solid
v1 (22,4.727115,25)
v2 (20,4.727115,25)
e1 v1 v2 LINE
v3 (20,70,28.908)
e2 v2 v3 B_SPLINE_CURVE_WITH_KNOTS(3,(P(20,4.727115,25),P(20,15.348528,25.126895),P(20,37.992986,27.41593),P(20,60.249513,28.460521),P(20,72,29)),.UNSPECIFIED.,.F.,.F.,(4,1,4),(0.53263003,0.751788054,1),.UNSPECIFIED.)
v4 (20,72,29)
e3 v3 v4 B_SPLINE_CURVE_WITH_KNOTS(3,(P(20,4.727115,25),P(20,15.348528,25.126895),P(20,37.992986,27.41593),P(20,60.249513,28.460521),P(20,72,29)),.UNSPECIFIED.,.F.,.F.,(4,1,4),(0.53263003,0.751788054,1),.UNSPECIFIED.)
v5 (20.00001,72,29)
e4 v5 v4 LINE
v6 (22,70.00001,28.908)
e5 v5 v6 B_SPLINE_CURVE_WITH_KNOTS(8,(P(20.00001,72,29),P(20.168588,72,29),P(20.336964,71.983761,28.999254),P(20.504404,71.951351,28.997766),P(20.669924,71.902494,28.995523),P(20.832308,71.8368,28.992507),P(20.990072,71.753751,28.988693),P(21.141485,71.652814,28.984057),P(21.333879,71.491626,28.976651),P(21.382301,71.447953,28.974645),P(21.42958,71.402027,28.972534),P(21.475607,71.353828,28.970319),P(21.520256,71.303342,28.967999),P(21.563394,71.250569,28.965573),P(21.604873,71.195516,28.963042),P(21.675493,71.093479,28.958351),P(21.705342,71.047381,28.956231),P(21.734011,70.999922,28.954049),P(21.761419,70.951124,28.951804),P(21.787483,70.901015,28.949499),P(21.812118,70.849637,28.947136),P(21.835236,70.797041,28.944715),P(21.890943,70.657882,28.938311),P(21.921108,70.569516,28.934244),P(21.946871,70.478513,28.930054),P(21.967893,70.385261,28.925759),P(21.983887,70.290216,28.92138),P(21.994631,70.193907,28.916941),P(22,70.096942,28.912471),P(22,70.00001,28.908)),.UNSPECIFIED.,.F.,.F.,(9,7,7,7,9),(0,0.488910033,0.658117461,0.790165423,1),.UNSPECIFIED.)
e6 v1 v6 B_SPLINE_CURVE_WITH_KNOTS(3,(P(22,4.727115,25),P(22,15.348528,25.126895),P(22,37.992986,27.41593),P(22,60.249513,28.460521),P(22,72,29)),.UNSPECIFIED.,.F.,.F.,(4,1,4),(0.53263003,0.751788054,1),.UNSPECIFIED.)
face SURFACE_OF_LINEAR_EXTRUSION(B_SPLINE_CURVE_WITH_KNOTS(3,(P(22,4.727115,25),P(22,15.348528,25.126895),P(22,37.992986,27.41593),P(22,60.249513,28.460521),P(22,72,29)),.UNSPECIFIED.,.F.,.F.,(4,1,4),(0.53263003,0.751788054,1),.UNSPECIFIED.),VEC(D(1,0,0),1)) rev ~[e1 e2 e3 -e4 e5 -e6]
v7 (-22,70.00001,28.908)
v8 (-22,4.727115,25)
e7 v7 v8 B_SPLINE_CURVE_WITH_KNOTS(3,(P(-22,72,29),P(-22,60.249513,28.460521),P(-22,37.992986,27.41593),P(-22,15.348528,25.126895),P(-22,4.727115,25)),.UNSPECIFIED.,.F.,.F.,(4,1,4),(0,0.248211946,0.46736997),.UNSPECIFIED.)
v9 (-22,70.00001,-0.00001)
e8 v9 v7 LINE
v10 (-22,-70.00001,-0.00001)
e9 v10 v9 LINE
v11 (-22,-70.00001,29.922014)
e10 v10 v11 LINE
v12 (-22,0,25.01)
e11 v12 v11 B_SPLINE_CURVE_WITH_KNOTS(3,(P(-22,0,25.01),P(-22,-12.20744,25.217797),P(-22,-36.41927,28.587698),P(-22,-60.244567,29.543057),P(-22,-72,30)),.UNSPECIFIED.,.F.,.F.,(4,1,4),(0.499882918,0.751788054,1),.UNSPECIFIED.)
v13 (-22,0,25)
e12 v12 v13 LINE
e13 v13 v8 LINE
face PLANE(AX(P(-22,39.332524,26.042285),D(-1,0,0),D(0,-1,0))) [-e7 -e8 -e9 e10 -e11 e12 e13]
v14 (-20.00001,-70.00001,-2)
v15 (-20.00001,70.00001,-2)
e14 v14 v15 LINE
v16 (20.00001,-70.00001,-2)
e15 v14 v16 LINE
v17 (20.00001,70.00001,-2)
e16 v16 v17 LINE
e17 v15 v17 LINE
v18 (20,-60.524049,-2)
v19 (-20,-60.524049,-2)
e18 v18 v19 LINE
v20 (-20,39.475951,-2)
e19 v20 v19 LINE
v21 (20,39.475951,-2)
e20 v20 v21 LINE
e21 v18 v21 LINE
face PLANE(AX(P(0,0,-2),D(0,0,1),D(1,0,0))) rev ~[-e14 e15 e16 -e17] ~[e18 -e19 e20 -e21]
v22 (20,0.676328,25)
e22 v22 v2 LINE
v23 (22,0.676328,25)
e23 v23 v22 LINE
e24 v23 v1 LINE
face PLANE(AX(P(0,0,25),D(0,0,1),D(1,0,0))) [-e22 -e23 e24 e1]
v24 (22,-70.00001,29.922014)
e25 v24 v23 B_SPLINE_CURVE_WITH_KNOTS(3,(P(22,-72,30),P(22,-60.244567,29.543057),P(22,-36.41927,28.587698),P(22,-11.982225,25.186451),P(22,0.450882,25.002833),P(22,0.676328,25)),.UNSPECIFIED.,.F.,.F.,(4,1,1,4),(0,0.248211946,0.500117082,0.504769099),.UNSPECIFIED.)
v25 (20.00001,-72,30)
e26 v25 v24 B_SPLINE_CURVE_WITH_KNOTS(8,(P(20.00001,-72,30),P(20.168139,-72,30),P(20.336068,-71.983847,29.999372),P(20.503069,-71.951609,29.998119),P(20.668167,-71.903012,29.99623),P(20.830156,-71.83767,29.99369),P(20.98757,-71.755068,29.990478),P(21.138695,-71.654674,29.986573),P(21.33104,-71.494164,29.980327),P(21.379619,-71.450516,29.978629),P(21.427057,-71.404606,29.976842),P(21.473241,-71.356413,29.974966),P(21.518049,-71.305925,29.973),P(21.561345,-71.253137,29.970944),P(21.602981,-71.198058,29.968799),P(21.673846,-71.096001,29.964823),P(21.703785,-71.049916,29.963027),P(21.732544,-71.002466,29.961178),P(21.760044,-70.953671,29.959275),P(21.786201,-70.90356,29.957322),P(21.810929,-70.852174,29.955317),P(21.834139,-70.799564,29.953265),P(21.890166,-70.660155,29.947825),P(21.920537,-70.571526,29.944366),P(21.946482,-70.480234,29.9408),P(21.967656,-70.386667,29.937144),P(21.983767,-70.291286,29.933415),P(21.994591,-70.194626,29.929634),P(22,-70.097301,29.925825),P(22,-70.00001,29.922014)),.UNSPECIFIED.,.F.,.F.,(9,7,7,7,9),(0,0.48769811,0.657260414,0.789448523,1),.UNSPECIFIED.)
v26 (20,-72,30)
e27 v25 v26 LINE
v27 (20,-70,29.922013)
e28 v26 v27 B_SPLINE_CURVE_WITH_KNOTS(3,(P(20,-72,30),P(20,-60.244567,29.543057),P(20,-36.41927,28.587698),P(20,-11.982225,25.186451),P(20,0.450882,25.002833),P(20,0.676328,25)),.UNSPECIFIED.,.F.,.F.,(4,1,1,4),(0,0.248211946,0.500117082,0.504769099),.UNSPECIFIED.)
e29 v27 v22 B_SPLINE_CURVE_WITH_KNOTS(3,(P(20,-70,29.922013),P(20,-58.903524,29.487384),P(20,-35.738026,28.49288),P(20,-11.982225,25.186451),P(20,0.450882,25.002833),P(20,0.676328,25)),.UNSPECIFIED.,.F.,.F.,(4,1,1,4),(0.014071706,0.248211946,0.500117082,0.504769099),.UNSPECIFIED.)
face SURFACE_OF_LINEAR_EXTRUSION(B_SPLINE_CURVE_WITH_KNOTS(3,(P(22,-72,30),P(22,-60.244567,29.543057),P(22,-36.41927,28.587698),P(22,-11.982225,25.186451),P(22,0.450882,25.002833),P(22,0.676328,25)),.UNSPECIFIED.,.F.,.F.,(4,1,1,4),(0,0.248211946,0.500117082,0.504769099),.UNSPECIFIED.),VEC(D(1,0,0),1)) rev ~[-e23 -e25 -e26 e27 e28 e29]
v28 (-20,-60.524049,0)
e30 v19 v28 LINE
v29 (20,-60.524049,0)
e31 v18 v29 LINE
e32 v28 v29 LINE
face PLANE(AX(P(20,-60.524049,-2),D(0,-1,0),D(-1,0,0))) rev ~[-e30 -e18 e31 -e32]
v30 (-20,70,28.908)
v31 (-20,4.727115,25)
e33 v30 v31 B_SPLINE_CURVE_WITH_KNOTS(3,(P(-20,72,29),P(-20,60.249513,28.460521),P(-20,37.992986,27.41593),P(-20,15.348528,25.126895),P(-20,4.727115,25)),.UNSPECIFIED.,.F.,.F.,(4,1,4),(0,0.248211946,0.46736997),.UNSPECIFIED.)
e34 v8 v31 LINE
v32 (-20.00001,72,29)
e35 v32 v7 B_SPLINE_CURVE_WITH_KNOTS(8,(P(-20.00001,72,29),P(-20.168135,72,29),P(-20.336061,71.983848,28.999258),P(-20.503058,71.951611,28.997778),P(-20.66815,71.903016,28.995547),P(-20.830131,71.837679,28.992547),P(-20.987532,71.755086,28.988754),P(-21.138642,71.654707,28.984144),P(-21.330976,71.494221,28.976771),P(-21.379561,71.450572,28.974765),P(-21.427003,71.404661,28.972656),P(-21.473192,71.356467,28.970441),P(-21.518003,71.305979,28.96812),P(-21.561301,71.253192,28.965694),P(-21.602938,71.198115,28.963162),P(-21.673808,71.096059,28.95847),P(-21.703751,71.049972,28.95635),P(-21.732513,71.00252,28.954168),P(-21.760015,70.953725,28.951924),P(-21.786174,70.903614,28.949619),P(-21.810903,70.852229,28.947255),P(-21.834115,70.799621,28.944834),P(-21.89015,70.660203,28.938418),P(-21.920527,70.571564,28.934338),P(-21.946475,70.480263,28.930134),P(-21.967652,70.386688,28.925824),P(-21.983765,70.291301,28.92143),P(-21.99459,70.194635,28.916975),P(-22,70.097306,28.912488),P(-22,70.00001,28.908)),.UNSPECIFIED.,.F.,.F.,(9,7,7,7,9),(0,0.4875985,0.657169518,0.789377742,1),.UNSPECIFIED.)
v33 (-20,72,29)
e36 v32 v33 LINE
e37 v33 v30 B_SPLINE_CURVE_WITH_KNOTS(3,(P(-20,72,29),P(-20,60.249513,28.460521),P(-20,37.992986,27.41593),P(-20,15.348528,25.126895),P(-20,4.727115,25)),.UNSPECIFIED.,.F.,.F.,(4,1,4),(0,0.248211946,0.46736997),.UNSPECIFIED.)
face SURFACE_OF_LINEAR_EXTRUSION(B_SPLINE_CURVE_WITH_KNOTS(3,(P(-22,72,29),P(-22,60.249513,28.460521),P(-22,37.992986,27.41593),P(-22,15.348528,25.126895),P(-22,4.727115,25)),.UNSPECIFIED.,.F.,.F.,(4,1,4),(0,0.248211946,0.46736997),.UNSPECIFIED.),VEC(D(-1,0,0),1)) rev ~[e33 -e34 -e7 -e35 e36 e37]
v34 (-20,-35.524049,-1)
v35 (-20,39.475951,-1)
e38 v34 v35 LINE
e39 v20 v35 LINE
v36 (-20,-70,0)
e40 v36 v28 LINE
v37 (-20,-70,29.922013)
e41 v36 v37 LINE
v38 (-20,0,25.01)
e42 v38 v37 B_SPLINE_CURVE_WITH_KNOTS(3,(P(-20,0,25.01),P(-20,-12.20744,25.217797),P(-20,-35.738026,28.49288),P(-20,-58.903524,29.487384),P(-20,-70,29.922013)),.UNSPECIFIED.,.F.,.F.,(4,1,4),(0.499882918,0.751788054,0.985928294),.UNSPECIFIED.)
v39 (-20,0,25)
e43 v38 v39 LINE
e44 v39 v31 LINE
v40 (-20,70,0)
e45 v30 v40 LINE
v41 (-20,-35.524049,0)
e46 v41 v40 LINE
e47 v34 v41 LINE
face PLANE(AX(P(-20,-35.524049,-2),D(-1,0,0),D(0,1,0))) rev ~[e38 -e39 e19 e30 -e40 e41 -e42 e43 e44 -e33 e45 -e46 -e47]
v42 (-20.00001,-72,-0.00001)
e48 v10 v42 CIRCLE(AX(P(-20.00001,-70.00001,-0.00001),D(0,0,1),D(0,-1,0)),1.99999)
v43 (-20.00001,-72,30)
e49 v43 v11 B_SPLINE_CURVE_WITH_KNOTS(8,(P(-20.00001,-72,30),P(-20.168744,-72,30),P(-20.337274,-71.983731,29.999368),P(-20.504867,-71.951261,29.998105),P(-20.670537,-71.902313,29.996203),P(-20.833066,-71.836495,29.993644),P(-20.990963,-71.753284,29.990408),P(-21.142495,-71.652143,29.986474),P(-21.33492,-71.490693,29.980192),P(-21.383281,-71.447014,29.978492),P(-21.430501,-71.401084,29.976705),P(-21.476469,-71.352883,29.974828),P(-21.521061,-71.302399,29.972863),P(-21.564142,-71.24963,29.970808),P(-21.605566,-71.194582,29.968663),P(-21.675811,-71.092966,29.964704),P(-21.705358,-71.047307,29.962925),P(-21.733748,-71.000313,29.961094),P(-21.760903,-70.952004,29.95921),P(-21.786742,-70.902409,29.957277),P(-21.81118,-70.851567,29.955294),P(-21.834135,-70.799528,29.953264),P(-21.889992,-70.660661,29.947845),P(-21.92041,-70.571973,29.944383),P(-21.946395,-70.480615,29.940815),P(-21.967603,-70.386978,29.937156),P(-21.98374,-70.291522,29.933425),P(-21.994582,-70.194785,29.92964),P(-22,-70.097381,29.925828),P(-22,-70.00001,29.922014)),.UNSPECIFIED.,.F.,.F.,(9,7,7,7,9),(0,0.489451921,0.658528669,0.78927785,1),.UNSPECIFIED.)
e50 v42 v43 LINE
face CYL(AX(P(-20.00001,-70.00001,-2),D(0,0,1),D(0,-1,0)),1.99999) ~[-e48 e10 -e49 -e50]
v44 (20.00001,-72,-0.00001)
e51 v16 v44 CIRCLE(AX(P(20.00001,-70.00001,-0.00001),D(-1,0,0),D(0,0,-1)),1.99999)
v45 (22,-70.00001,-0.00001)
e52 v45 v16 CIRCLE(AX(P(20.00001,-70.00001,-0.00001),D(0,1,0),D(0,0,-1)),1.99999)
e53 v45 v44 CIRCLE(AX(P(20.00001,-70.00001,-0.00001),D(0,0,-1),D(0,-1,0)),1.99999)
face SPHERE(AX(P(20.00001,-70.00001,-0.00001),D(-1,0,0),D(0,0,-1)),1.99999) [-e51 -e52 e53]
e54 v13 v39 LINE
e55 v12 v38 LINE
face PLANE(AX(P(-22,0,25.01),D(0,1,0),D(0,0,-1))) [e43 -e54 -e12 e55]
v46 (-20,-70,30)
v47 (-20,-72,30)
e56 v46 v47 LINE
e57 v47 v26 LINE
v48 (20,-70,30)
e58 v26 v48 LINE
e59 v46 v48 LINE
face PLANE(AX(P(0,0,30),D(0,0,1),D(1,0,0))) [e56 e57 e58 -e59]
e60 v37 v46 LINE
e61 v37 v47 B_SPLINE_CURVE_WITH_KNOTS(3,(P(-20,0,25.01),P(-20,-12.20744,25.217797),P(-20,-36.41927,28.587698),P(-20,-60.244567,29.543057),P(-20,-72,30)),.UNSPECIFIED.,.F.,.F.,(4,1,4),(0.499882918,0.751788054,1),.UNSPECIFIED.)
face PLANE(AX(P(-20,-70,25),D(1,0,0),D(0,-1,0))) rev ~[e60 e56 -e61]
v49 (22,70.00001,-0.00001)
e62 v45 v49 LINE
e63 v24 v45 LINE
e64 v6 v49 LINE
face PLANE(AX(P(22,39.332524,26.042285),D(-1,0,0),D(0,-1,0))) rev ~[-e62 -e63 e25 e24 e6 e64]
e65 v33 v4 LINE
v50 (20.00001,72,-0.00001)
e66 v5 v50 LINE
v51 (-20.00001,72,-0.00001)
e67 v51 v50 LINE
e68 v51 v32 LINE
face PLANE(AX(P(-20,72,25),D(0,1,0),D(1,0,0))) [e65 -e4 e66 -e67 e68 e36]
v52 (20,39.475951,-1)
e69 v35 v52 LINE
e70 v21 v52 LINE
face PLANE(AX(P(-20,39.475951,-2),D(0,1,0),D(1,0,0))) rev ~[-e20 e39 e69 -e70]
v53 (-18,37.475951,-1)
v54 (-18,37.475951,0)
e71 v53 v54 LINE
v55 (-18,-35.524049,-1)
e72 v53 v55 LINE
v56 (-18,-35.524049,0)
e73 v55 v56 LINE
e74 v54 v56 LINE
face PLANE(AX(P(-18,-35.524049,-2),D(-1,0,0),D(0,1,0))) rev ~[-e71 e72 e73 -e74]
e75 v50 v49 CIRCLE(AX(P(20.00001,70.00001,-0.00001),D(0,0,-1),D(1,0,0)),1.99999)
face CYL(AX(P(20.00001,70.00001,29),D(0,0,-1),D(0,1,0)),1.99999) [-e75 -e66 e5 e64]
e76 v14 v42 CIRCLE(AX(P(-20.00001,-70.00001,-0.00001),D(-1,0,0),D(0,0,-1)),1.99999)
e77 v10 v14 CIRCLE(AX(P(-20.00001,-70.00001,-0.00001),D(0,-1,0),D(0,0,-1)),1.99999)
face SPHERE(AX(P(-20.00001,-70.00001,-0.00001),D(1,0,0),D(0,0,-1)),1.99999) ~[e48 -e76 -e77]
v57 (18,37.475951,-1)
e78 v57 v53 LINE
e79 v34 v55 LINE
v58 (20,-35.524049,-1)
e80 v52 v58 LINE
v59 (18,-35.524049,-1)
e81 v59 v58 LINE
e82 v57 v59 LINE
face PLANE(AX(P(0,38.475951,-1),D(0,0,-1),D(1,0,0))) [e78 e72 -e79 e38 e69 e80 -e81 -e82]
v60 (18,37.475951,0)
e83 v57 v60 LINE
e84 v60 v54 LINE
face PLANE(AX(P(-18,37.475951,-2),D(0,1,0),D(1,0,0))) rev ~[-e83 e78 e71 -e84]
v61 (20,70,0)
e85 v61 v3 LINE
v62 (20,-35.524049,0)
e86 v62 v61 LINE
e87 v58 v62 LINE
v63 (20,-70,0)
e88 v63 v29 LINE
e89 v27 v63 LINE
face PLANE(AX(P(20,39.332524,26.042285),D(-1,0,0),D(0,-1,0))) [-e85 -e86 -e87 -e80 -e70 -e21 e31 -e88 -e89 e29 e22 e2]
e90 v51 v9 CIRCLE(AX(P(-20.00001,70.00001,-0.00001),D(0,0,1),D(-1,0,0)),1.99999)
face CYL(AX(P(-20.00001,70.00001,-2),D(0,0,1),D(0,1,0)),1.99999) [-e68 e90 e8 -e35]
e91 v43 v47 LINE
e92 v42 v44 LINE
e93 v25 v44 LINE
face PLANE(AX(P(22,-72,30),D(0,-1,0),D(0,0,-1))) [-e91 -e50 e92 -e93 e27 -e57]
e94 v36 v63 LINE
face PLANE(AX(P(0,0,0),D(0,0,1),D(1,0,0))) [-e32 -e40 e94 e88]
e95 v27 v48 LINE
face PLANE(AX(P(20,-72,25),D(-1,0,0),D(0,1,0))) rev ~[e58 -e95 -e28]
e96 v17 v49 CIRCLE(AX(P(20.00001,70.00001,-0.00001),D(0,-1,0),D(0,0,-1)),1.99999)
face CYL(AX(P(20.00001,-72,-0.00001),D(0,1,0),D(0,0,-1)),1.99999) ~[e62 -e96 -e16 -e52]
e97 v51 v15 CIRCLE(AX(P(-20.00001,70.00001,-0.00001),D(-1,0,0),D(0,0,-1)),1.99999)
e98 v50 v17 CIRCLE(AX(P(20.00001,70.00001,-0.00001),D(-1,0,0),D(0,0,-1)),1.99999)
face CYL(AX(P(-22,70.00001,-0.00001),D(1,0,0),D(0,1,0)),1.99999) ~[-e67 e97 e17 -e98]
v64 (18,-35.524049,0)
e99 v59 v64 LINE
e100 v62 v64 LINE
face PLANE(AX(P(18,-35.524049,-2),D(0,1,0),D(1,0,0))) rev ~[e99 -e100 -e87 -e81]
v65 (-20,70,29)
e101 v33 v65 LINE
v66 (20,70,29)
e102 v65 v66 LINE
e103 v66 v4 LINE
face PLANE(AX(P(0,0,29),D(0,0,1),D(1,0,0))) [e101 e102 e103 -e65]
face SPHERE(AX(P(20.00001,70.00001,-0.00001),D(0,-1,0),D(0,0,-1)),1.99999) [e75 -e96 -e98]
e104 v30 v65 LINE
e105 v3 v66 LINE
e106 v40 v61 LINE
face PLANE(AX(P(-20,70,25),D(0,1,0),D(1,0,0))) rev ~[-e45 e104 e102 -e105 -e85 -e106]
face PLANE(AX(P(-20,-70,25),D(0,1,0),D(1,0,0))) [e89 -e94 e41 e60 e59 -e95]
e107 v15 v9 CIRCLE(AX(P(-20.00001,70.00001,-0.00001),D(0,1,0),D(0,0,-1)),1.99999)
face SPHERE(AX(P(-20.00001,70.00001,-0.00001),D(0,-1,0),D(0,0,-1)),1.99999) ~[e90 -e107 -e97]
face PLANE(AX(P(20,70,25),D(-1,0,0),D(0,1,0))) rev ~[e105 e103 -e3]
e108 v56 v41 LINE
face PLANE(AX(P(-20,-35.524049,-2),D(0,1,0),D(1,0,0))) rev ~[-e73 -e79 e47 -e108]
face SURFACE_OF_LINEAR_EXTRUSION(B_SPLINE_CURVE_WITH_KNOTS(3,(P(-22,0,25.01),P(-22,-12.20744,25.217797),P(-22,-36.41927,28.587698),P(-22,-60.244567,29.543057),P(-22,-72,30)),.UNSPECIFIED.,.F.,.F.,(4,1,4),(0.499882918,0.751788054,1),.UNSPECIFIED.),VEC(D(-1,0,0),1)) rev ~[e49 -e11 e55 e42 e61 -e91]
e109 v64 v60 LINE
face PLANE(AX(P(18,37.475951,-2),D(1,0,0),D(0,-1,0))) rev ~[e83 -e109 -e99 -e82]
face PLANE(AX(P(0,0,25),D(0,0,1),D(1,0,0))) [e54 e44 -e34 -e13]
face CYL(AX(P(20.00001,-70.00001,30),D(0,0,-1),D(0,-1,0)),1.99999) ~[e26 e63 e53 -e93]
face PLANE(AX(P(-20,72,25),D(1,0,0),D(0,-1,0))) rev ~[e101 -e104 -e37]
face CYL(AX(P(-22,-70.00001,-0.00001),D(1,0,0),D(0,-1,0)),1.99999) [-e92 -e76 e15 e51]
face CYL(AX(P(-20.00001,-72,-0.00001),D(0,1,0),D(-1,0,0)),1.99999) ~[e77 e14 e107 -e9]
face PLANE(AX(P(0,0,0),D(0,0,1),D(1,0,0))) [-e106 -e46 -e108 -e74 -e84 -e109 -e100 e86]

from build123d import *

# Parameters (mm, degrees)
F0_W      = 44
F0_H      = 144
F0_W_2    = 40
F0_H_2    = 140
F1_DEPTH  = 2
F2_DEPTH  = 25
F5_DEPTH  = 2
F6_DEPTH  = 2
F7_DEPTH  = 5
F8_DEPTH  = 4
F10_DEPTH = 32.0010001
F9_W      = 36
F9_H      = 2
F9_W_2    = 2
F9_H_2    = 73
F11_DEPTH = 1
F12_R     = 1.99999


# Not quite as in the source:
# - a fillet or chamfer is up to 0.001 mm smaller than in the source, because OpenCascade refuses the exact size


with BuildPart() as f1:
    # F0 (on Top) → F1 (new body)
    with BuildSketch(Plane.XY):
        Rectangle(F0_W, F0_H)
        Rectangle(F0_W_2, F0_H_2, mode=Mode.SUBTRACT)
        Rectangle(F0_W_2, F0_H_2)
    extrude(amount=-F1_DEPTH)

    # F0 (on Top) → F2 (join)
    with BuildSketch(Plane.XY):
        Rectangle(F0_W, F0_H)
        Rectangle(F0_W_2, F0_H_2, mode=Mode.SUBTRACT)
    extrude(amount=F2_DEPTH)

    # F3 (on face) → F5 (join)
    with BuildSketch(Plane.YZ.offset(22)):
        with BuildLine():
            add(Edge.make_bspline(
                [(4.7271151019, 25), (15.348527654, 25.1268953042), (37.9929862917, 27.4159301893), (60.2495129104, 28.4605212291), (72, 29)],
                knots=[0.5326300299, 0.5326300299, 0.5326300299, 0.5326300299, 0.7517880542, 1, 1, 1, 1], degree=3))
            Line((4.7271151019, 25), (72, 25))
            Line((72, 25), (72, 29))
        make_face()
        with BuildLine():
            Line((-72, 30), (-72, 25))
            Line((-72, 25), (0.6763282883, 25))
            add(Edge.make_bspline(
                [(-72, 30), (-60.2445668251, 29.5430569498), (-36.4192696174, 28.5876982607), (-11.9822251211, 25.1864507884), (0.4508819142, 25.0028330974), (0.6763282883, 25)],
                knots=[0, 0, 0, 0, 0.2482119458, 0.5001170824, 0.504769099, 0.504769099, 0.504769099, 0.504769099], degree=3))
        make_face()
    extrude(amount=-F5_DEPTH)

    # F4 (on face) → F6 (join)
    with BuildSketch(Plane(origin=(-22, 0, 0), x_dir=(0, -1, 0), z_dir=(-1, 0, 0))):
        with BuildLine():
            Line((-72, 29), (-72, 25))
            Line((-72, 25), (-4.7271151019, 25))
            add(Edge.make_bspline(
                [(-72, 29), (-60.2495129104, 28.4605212291), (-37.9929862917, 27.4159301893), (-15.348527654, 25.1268953042), (-4.7271151019, 25)],
                knots=[0, 0, 0, 0, 0.2482119458, 0.4673699701, 0.4673699701, 0.4673699701, 0.4673699701], degree=3))
        make_face()
        with BuildLine():
            Line((0, 25), (72, 25))
            Line((72, 25), (72, 30))
            add(Edge.make_bspline(
                [(0, 25.01), (12.2074400514, 25.2177971205), (36.4192696174, 28.5876982607), (60.2445668251, 29.5430569498), (72, 30)],
                knots=[0.4998829176, 0.4998829176, 0.4998829176, 0.4998829176, 0.7517880542, 1, 1, 1, 1], degree=3))
            Line((0, 25.01), (0, 25))
        make_face()
    extrude(amount=-F6_DEPTH)

    # F7 (add): a face of the model
    f7_faces = [f1.faces().sort_by_distance(p)[0] for p in [
        (0, -71, 25),
    ]]
    extrude(f7_faces, amount=F7_DEPTH)

    # F8 (add): a face of the model
    f8_faces = [f1.faces().sort_by_distance(p)[0] for p in [
        (0, 71, 25),
    ]]
    extrude(f8_faces, amount=F8_DEPTH)

    # F9 (on face) → F10 (cut, through all)
    with BuildSketch(Plane(origin=(0, 0, -2), x_dir=(1, 0, 0), z_dir=(0, 0, -1))):
        Polygon((20, 35.5240486562), (20, 60.5240486562), (-20, 60.5240486562), (-20, 35.5240486562), (-18, 35.5240486562), (-18, -37.4759513438), (18, -37.4759513438), (18, 35.5240486562), align=None)
    extrude(amount=-F10_DEPTH, mode=Mode.SUBTRACT)

    # F9 (on face) → F11 (cut)
    with BuildSketch(Plane(origin=(0, 0, -2), x_dir=(1, 0, 0), z_dir=(0, 0, -1))):
        with Locations((0, -38.4759513438)):
            Rectangle(F9_W, F9_H)
        with Locations((-19, -38.4759513438)):
            Rectangle(F9_W_2, F9_H)
        with Locations((-19, -0.9759513438)):
            Rectangle(F9_W_2, F9_H_2)
        with Locations((19, -38.4759513438)):
            Rectangle(F9_W_2, F9_H)
        with Locations((19, -0.9759513438)):
            Rectangle(F9_W_2, F9_H_2)
    extrude(amount=-F11_DEPTH, mode=Mode.SUBTRACT)

    # F12 (radius 2 in the source; OpenCascade refuses exactly that, so slightly less here)
    f12_edges = [f1.edges().sort_by_distance(p)[0] for p in [
        (0, -72, -2),
        (-22, 0, -2),
        (22, 0, -2),
        (-22, -72, 14),
        (22, -72, 14),
        (0, 72, -2),
        (-22, 72, 13.5),
        (22, 72, 13.5),
    ]]
    fillet(f12_edges, radius=F12_R)


solid = f1.part
